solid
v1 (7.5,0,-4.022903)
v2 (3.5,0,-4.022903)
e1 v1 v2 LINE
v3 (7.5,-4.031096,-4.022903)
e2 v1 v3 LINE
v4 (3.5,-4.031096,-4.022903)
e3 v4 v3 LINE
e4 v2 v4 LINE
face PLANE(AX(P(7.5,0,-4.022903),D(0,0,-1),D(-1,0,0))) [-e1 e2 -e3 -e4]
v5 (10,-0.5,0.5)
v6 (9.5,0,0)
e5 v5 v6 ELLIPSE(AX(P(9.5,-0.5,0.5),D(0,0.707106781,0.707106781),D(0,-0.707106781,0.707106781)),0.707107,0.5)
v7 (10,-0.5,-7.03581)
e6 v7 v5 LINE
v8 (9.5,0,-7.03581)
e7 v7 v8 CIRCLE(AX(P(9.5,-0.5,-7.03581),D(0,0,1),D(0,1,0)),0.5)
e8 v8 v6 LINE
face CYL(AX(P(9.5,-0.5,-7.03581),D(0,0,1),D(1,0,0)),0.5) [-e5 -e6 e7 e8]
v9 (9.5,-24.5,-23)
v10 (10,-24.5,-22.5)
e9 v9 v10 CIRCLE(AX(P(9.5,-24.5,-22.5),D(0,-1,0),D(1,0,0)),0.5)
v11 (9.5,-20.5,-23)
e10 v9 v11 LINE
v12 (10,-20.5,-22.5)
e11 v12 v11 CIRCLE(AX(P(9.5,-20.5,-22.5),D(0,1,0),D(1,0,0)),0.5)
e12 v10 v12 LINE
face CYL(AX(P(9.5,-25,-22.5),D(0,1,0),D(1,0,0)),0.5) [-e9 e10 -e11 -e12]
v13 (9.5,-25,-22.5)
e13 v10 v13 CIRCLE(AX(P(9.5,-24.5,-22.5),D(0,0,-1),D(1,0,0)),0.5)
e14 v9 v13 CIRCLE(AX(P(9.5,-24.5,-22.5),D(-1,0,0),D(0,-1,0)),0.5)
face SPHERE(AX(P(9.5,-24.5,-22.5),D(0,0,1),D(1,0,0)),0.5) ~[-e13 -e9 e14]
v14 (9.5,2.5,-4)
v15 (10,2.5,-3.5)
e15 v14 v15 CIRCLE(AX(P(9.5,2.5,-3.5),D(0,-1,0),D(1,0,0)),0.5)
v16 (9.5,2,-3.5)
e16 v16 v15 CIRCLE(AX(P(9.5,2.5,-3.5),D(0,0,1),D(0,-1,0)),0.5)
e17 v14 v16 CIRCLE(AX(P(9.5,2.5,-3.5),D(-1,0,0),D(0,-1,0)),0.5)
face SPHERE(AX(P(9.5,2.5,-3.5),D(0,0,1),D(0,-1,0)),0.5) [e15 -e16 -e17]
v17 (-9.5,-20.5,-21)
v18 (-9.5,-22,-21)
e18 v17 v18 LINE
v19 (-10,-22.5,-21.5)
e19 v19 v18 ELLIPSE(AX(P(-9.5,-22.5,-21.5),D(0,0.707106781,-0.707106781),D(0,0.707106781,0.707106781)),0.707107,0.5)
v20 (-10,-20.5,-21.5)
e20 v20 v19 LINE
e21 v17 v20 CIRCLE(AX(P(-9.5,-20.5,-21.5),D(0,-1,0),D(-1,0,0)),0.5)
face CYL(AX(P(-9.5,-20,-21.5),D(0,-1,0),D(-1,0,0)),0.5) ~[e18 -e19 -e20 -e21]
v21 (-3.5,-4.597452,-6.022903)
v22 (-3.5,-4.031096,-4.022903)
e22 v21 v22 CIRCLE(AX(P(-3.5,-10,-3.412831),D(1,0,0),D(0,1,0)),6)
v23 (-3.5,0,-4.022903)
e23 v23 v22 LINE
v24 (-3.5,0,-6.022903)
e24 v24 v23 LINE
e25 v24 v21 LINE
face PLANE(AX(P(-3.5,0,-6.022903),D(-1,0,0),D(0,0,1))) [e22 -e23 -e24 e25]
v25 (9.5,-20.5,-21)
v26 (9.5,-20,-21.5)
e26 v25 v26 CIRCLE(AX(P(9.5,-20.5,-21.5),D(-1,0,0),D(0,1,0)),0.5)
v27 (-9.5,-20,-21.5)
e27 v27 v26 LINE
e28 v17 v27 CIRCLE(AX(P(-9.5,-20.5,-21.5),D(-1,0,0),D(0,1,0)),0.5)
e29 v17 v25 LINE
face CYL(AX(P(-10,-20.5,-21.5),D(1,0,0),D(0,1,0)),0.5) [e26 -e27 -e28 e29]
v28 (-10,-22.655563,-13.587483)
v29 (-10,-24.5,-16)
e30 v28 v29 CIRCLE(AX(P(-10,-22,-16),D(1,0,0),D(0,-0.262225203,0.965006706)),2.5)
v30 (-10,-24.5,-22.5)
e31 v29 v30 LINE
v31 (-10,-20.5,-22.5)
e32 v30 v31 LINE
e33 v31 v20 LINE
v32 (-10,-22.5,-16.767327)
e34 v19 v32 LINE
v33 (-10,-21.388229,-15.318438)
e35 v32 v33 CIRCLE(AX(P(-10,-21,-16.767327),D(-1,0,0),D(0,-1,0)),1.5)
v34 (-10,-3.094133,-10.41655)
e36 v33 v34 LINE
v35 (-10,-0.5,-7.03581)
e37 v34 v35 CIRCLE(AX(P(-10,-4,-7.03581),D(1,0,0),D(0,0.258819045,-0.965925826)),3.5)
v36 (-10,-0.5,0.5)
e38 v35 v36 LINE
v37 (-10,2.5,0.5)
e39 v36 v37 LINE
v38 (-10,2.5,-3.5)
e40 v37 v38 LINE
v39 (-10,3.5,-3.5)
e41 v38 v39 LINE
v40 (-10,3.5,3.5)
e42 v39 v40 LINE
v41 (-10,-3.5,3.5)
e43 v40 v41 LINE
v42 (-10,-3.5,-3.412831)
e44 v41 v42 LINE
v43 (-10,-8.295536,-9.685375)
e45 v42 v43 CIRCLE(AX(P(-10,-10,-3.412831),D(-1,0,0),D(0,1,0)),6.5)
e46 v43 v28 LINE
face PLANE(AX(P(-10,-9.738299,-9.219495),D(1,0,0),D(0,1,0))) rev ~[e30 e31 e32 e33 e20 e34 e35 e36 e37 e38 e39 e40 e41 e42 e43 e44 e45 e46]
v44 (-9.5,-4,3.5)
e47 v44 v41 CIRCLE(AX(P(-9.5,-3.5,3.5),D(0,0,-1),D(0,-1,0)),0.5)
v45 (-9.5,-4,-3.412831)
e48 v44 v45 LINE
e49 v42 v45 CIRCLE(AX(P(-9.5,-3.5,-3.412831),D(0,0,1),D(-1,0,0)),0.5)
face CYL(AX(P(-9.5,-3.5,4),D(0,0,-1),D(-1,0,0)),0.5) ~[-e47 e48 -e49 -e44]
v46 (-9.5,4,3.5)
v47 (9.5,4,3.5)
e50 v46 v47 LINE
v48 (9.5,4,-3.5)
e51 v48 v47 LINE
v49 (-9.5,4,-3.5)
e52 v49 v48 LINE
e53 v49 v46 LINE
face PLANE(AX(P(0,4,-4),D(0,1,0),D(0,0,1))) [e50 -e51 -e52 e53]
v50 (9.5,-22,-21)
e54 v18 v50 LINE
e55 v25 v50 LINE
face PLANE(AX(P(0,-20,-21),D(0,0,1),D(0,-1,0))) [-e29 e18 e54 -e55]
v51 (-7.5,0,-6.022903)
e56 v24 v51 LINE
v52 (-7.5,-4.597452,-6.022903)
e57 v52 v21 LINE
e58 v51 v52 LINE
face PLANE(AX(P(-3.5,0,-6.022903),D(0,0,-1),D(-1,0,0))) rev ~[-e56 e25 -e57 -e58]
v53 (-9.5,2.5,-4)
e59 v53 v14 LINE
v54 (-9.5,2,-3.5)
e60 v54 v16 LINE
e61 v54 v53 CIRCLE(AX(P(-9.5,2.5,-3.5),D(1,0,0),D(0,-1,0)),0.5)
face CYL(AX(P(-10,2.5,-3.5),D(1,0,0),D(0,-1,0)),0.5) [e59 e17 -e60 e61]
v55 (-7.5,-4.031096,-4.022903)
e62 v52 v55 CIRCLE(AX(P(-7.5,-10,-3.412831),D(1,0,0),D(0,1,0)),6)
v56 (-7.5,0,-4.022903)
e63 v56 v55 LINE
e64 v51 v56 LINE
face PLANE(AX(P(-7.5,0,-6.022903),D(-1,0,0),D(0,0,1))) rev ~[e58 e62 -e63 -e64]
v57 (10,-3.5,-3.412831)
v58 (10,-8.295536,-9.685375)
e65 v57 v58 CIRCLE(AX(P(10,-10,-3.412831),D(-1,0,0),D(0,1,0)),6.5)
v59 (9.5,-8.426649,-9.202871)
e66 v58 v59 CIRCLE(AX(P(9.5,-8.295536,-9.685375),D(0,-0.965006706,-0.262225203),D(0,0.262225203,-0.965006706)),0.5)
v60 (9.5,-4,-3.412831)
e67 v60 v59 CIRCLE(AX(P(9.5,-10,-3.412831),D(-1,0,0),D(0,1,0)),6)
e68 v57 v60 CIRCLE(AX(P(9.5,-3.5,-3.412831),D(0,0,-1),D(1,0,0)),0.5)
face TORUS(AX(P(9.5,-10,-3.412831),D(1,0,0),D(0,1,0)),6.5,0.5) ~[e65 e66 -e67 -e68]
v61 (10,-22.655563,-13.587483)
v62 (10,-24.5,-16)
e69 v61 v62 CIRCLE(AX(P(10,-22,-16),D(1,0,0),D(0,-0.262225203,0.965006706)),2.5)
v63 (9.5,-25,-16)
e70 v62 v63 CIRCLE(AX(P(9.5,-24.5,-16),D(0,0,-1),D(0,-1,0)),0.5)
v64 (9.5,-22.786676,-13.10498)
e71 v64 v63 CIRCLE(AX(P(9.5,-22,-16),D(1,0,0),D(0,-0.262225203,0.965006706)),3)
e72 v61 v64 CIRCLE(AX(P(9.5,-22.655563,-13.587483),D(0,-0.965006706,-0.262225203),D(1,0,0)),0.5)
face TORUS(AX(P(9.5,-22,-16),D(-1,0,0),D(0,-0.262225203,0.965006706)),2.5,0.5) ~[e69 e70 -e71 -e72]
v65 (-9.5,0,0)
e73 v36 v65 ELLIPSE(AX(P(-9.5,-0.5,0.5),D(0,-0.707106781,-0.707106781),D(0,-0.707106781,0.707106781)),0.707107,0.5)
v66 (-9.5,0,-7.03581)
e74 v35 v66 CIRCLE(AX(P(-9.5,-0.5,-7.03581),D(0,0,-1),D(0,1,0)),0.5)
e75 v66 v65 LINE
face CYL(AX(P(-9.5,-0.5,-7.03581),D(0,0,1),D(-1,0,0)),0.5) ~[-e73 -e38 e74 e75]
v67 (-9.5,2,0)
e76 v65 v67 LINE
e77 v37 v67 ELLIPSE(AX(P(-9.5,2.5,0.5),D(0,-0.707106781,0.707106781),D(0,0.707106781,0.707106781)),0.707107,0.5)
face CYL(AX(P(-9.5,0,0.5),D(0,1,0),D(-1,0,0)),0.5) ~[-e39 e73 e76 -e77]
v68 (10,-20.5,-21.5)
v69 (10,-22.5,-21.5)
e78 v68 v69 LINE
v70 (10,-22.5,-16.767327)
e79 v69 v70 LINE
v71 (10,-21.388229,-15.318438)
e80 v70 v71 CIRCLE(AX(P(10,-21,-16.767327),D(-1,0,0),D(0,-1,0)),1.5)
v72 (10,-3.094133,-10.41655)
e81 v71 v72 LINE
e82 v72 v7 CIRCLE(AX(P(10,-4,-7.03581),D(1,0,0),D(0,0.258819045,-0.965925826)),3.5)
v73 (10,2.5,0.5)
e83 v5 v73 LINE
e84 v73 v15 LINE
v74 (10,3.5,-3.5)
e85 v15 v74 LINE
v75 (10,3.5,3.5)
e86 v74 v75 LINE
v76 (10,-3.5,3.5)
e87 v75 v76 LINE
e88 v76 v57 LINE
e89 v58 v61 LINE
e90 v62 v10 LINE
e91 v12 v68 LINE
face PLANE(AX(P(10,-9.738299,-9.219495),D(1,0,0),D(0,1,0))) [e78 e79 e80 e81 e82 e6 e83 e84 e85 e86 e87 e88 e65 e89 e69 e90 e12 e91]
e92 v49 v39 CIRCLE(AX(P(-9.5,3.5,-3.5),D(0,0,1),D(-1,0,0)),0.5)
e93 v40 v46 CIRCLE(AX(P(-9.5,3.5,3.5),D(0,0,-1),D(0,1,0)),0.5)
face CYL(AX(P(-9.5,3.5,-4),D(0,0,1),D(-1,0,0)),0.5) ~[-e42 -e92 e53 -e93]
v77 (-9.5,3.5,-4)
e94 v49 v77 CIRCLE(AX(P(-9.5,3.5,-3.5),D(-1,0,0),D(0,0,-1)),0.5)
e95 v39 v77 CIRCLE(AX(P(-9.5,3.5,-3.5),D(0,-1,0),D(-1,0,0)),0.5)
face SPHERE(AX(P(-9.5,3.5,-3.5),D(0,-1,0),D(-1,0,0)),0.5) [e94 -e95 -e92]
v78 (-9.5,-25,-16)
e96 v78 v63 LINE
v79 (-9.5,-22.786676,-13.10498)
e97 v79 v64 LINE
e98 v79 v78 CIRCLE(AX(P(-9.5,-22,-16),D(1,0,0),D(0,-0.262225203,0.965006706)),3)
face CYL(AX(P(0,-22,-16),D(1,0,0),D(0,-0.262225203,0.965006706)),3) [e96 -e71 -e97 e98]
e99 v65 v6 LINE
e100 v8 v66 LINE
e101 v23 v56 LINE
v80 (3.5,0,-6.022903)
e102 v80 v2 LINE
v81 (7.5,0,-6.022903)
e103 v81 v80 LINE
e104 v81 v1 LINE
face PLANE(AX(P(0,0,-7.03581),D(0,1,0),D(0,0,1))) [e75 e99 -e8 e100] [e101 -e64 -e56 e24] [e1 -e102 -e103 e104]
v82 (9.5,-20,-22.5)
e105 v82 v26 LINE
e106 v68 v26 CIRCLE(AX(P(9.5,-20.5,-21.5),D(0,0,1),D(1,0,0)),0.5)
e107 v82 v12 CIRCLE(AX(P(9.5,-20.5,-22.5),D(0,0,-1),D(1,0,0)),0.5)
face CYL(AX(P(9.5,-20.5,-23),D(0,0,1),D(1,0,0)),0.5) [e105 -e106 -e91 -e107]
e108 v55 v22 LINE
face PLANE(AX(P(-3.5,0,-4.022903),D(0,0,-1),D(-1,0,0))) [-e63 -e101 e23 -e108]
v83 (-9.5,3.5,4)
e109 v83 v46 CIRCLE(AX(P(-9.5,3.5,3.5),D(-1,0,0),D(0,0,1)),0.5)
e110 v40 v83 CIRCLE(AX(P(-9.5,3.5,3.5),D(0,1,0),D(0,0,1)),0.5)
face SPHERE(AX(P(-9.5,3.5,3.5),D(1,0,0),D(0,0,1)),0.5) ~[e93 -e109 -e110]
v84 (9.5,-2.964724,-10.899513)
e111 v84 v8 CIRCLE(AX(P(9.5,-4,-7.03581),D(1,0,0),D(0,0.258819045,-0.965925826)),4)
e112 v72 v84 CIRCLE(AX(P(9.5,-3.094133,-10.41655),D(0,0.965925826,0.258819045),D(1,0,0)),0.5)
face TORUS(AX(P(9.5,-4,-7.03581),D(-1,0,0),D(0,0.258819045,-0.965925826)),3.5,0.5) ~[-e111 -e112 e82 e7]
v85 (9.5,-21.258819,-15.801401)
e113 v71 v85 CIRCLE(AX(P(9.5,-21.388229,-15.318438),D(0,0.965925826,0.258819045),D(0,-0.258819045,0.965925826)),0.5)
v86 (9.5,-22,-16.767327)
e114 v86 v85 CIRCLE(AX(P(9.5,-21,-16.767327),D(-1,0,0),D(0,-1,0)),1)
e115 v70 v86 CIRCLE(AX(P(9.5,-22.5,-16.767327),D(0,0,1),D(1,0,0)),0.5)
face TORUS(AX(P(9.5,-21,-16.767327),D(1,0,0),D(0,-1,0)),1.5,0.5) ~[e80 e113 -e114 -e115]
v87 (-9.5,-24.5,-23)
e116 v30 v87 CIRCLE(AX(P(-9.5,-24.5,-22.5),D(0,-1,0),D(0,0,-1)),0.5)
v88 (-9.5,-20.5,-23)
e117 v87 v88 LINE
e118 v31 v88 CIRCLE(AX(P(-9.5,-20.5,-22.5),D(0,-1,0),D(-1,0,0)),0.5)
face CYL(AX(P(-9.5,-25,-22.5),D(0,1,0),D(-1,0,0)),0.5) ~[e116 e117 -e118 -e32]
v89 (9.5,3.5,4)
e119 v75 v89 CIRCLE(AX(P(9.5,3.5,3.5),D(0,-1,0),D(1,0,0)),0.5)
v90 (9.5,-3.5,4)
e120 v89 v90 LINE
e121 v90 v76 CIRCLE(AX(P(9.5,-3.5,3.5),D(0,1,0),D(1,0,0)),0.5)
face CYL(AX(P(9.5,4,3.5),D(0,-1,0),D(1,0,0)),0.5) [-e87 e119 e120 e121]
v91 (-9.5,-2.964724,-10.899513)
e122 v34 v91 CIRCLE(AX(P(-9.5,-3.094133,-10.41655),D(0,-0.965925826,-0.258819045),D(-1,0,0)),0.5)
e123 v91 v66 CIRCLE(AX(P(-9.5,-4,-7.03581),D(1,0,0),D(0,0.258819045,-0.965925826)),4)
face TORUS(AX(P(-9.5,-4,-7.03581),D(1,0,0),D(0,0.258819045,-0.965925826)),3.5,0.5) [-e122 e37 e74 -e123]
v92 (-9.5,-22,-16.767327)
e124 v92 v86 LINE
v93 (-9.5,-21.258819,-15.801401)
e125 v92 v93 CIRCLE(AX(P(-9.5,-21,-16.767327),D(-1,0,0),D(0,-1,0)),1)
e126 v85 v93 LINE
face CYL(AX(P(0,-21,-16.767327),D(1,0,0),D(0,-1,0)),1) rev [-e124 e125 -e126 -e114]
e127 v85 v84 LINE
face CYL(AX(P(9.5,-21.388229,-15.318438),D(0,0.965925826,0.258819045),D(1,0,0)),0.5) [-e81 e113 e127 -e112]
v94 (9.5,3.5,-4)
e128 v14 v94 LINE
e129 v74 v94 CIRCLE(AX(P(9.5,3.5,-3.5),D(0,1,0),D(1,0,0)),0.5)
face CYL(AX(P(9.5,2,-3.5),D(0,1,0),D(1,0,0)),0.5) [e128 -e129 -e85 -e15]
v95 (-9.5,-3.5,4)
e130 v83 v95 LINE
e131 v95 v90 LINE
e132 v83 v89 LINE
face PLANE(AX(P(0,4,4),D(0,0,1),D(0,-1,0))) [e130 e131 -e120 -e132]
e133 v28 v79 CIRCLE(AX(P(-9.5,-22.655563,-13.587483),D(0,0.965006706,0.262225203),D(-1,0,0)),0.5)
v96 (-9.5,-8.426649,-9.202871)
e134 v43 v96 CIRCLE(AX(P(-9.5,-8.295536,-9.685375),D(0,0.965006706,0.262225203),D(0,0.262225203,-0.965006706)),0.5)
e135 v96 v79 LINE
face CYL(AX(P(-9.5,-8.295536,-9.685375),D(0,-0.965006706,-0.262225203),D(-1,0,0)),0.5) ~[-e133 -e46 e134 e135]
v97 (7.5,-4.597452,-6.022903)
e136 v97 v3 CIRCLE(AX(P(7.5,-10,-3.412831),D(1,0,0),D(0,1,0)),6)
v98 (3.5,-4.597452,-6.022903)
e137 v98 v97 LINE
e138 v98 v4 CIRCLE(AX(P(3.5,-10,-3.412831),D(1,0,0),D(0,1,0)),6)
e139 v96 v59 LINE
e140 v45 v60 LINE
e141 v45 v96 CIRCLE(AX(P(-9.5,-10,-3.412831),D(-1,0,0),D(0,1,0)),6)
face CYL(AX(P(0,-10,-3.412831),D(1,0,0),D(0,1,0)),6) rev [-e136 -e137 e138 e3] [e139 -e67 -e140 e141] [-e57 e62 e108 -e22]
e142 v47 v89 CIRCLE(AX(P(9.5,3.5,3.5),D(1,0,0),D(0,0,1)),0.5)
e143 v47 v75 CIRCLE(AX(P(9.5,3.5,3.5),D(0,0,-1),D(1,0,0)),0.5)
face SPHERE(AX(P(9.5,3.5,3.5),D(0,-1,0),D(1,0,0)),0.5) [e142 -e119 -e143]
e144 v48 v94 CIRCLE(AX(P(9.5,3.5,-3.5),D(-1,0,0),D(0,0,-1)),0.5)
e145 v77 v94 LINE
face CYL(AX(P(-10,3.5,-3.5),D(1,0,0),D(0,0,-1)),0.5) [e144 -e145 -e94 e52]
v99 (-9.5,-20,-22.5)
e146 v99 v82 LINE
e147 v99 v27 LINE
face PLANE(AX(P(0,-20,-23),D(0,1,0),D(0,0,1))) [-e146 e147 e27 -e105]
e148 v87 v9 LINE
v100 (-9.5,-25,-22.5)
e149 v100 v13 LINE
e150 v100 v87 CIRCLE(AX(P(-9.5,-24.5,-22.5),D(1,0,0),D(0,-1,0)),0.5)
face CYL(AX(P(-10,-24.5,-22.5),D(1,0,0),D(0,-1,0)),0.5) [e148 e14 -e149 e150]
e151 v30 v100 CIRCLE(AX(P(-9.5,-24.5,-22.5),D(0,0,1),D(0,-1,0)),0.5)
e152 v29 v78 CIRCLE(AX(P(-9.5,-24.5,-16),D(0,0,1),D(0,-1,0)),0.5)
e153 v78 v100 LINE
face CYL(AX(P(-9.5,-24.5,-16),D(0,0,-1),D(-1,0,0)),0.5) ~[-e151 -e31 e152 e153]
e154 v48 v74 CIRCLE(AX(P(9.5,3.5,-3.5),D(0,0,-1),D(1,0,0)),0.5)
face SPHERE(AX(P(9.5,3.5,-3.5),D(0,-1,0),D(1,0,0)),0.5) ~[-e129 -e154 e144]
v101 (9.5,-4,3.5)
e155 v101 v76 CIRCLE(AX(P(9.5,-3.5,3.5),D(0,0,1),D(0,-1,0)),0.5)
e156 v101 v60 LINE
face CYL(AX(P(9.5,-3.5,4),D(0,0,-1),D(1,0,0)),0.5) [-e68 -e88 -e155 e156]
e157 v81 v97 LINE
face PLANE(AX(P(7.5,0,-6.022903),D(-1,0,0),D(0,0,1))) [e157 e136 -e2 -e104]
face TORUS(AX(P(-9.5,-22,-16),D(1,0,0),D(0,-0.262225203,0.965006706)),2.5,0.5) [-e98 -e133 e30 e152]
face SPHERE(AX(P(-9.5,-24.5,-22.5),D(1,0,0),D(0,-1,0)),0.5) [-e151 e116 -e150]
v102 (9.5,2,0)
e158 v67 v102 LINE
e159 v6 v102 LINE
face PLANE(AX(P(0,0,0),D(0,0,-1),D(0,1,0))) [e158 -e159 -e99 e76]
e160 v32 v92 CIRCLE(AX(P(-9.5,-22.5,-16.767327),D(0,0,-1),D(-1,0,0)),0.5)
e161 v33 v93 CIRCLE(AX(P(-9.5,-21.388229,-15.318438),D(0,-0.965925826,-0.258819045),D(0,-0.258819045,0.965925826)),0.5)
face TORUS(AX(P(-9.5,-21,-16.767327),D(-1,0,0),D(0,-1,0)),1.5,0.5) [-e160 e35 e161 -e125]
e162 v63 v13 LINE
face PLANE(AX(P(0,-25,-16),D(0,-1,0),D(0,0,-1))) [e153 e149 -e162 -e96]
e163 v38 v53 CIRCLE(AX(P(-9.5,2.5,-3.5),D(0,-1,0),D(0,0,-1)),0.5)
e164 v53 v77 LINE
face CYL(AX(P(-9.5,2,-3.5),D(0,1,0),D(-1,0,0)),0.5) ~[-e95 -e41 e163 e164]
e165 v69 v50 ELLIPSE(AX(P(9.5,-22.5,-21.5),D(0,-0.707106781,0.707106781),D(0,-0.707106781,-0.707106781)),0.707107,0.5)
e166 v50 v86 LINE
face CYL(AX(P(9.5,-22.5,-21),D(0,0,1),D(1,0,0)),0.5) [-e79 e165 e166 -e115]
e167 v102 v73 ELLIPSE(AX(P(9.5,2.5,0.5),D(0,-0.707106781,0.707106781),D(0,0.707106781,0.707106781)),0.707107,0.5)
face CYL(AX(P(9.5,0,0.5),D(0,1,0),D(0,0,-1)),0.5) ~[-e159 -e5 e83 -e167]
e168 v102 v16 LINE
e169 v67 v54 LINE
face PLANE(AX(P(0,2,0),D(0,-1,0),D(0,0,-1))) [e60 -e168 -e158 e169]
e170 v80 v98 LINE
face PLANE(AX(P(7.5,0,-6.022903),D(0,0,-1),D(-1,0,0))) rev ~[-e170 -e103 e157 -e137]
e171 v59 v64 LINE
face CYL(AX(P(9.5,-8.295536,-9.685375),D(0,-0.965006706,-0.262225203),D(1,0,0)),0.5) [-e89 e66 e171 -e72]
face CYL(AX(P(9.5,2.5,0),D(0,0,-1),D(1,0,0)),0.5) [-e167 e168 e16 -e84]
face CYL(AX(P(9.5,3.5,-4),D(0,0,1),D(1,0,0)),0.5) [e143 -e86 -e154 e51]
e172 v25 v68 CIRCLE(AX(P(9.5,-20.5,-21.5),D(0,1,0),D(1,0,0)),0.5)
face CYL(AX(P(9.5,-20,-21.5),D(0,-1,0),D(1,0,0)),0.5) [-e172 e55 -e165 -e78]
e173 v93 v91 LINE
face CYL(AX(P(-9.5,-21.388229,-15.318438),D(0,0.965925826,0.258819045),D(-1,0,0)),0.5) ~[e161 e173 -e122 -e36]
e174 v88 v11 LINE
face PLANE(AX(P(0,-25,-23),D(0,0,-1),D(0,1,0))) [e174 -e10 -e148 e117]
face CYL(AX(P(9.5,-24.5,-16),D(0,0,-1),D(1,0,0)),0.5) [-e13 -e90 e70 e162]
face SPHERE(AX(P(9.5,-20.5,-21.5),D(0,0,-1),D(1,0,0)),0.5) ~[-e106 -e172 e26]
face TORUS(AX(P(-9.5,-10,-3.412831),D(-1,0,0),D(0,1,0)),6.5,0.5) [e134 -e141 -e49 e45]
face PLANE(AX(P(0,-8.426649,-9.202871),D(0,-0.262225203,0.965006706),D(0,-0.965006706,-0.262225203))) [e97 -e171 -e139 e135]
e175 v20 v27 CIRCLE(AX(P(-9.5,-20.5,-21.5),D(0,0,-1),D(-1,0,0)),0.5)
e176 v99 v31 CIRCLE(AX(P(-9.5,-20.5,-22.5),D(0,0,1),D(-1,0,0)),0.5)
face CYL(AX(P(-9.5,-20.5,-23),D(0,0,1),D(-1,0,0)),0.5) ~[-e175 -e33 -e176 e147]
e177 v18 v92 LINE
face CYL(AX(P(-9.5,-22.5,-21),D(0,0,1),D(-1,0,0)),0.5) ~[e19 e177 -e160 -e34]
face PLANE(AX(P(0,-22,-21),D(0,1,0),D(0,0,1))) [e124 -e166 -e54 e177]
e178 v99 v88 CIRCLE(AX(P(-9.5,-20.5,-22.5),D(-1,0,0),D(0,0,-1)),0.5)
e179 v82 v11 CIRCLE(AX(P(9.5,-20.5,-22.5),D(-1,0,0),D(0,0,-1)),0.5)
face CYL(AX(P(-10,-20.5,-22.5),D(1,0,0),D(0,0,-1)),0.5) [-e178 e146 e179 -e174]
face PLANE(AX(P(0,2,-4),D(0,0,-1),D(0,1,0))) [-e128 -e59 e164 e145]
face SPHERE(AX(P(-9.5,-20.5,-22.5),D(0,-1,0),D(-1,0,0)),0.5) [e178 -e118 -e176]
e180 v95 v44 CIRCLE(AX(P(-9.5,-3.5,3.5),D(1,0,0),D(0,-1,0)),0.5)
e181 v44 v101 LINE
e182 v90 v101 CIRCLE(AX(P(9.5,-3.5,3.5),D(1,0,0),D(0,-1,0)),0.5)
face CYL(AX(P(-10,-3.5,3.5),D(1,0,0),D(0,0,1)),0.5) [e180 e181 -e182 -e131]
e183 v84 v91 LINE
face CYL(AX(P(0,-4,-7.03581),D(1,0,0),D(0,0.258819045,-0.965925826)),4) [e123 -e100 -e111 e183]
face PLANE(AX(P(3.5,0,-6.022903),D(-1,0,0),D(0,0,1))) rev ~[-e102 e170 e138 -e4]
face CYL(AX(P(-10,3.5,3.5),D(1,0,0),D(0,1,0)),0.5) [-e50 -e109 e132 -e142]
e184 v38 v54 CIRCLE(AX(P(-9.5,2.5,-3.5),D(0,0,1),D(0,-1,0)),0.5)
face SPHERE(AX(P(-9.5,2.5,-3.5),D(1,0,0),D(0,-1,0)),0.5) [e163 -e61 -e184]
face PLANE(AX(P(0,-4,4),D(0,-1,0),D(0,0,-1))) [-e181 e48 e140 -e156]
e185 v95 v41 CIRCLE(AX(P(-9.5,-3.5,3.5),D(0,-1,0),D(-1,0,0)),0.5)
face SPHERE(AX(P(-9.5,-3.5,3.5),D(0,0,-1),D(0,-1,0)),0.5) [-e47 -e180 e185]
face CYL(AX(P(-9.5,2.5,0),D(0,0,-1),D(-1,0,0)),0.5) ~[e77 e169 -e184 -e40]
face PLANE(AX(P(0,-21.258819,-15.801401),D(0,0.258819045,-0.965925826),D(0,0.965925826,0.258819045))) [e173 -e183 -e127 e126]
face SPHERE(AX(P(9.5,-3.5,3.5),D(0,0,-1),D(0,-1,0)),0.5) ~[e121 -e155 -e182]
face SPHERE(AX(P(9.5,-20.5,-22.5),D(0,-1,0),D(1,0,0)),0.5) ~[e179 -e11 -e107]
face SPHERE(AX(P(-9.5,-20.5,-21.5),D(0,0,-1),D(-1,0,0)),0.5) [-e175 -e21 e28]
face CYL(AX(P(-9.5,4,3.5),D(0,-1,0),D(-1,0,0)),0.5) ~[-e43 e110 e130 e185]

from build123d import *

# Parameters (mm, degrees)
F1_DEPTH = 10
F2_W     = 4
F2_H     = 2
F3_DEPTH = 4.5984521023
F4_R     = 0.5


with BuildPart() as f1:
    # F0 (on Right) → F1 (new body, symmetric)
    with BuildSketch(Plane.YZ):
        with BuildLine():
            Line((0, -7.0358098146), (0, 0))
            Line((0, 0), (2, 0))
            Line((2, 0), (2, -4))
            Line((2, -4), (4, -4))
            Line((4, -4), (4, 0))
            Line((4, 0), (4, 4))
            Line((4, 4), (-4, 4))
            Line((-4, 4), (-4, 0))
            Line((-4, 0), (-4, -3.4128310664))
            ThreePointArc((-4, -3.4128310664), (-5.2334442571, -7.0569971371), (-8.4266487834, -9.2028713037))
            Line((-8.4266487834, -9.2028713037), (-22.7866756083, -13.1049798814))
            ThreePointArc((-22.7866756083, -13.1049798814), (-24.3832778714, -14.1779169647), (-25, -16))
            Line((-25, -16), (-25, -21))
            Line((-25, -21), (-25, -23))
            Line((-25, -23), (-20, -23))
            Line((-20, -23), (-20, -21))
            Line((-20, -21), (-22, -21))
            Line((-22, -21), (-22, -16.767326988))
            ThreePointArc((-22, -16.767326988), (-21.7933533403, -16.158565559), (-21.2588190451, -15.8014011617))
            Line((-21.2588190451, -15.8014011617), (-2.9647238196, -10.8995131198))
            ThreePointArc((-2.9647238196, -10.8995131198), (-0.8265866388, -9.4708555306), (0, -7.0358098146))
        make_face()
    extrude(amount=F1_DEPTH, both=True)

    # F2 (on face) → F3 (cut, through all)
    with BuildSketch(Plane(origin=(0, 0, 0), x_dir=(-1, 0, 0), z_dir=(0, 1, 0))):
        with Locations((-5.5, -5.0229031369)):
            Rectangle(F2_W, F2_H)
        with Locations((5.5, -5.0229031369)):
            Rectangle(F2_W, F2_H)
    extrude(amount=-F3_DEPTH, mode=Mode.SUBTRACT)

    # F4
    f4_edges = [f1.edges().sort_by_distance(p)[0] for p in [
        (10, -5.233444, -7.056997),
        (10, -15.606662, -11.153926),
        (10, -22.5, -23),
        (10, -20, -22),
        (10, -21, -21),
        (10, -22, -18.883663),
        (0, -25, -23),
        (-10, -25, -19.5),
        (0, -4, 4),
        (10, 0, 4),
        (10, 1, 0),
        (10, 2, -2),
        (0, 2, -4),
        (10, 3, -4),
        (10, 4, 0),
        (0, 4, 4),
        (-10, 0, 4),
        (-10, -0.826587, -9.470856),
        (-10, 0, -3.517905),
        (-10, 1, 0),
        (-10, 2, -2),
        (-10, 3, -4),
        (-10, 4, 0),
        (-10, -4, 0.293584),
        (-10, -5.233444, -7.056997),
        (-10, -15.606662, -11.153926),
        (-10, -24.383278, -14.177917),
        (-10, -22.5, -23),
        (-10, -20, -22),
        (-10, -21, -21),
        (-10, -22, -18.883663),
        (-10, -21.793353, -16.158566),
        (-10, -12.111771, -13.350457),
        (10, -24.383278, -14.177917),
        (10, -21.793353, -16.158566),
        (0, -20, -21),
        (0, -20, -23),
        (0, 4, -4),
    ]]
    fillet(f4_edges, radius=F4_R)


solid = f1.part
